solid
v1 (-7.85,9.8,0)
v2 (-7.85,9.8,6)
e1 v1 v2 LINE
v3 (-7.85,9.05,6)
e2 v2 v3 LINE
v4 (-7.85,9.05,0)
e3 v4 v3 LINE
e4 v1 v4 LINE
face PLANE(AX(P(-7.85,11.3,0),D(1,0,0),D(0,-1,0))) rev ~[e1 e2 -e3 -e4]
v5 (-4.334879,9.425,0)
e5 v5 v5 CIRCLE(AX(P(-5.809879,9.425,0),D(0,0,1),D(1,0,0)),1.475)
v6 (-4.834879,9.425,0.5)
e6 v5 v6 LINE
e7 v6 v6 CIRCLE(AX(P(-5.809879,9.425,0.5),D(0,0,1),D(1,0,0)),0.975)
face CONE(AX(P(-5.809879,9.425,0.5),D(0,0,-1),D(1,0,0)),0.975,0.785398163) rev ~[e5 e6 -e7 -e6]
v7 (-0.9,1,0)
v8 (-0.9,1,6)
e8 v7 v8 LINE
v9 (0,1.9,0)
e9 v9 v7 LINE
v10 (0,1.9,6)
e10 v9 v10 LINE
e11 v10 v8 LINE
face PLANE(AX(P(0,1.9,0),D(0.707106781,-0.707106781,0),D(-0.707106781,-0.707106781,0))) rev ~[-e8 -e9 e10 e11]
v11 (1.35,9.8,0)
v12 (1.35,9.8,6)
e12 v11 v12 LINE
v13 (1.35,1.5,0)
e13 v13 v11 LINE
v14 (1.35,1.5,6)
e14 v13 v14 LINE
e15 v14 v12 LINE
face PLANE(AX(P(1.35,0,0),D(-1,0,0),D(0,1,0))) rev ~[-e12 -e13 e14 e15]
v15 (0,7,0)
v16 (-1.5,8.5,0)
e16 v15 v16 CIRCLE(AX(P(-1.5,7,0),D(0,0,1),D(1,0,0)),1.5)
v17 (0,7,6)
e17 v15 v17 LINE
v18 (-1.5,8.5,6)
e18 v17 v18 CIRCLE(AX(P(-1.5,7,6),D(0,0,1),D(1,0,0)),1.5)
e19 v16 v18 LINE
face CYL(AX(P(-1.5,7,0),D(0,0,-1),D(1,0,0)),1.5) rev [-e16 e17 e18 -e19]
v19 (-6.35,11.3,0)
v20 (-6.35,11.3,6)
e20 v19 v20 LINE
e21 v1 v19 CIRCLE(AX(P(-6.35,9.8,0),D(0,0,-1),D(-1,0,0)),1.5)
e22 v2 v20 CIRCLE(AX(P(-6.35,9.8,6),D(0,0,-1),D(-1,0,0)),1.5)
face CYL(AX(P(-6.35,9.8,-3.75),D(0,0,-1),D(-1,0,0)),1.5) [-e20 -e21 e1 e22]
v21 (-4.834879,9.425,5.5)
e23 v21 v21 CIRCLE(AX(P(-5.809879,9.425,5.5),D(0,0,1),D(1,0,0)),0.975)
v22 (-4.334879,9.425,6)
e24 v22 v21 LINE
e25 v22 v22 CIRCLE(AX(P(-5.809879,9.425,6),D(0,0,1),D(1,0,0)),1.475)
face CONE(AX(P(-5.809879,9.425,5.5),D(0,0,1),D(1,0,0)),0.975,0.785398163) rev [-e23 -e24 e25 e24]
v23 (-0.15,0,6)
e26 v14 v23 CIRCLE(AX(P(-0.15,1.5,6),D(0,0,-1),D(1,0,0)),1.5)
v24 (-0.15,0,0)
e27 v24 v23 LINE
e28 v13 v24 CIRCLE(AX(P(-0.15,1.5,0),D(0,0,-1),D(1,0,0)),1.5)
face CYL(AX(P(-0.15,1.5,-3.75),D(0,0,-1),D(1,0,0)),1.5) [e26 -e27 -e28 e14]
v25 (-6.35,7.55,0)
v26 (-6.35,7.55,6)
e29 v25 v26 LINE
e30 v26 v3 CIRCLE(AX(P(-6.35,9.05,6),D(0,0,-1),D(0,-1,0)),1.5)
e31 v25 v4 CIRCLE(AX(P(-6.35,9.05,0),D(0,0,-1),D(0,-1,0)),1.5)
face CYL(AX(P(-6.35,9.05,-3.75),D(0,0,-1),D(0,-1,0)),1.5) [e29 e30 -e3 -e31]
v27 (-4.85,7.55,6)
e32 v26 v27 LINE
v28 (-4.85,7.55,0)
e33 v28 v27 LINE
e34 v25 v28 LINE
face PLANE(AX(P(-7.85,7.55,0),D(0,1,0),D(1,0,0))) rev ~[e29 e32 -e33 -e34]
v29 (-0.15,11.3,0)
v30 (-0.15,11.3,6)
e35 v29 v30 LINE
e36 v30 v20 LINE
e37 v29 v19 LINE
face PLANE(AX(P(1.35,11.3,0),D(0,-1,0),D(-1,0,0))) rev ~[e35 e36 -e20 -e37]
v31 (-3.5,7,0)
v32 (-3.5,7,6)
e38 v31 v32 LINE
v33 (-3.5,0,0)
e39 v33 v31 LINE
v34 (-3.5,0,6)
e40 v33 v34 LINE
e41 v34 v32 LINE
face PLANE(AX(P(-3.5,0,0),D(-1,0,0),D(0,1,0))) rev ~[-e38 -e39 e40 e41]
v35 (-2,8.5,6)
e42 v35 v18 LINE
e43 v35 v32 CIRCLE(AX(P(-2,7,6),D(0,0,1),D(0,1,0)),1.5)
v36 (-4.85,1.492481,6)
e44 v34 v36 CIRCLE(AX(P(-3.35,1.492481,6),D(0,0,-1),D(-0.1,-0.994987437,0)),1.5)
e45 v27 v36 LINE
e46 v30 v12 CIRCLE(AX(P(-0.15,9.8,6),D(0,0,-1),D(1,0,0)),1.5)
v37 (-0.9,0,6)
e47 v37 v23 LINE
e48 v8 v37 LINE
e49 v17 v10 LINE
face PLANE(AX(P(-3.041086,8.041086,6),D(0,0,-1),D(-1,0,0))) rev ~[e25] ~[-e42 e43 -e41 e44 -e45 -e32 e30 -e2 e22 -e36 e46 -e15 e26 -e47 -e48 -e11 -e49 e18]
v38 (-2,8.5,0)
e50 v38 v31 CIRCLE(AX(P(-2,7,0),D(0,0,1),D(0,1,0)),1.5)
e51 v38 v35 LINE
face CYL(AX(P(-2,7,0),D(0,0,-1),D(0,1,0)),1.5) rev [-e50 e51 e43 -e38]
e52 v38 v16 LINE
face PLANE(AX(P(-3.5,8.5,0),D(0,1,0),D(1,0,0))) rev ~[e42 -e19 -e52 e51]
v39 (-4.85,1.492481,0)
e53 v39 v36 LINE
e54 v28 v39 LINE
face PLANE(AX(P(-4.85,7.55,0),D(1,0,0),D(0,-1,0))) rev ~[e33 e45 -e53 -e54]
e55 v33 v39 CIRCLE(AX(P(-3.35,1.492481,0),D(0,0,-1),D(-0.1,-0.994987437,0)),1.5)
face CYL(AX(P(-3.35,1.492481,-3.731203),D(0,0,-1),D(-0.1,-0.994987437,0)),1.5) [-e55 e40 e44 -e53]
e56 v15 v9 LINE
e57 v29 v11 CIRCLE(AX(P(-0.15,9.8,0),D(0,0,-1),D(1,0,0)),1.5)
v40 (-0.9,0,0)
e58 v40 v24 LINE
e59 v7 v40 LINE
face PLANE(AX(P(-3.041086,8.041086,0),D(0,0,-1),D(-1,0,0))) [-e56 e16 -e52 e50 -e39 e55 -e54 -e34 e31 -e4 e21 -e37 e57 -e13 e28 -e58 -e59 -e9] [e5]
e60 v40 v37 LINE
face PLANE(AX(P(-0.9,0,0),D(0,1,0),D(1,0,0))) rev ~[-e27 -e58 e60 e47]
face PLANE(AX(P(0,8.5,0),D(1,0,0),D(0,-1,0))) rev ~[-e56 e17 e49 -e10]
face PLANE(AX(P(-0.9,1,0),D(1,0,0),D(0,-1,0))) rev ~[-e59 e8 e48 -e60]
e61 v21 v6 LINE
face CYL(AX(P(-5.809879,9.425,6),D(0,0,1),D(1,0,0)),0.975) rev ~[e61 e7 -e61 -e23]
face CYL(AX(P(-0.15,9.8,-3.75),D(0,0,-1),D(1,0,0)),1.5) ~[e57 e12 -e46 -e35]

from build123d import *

# Parameters (mm, degrees)
F1_DEPTH     = 6
F2_R         = 0.975
F3_DEPTH     = 6.001
F4_T1_DEPTH  = 6
F4_T3_DEPTH  = 6
F4_T5_DEPTH  = 13.5
F4_T7_DEPTH  = 13.5
F4_T9_DEPTH  = 13.5
F4_T11_DEPTH = 13.5
F4_T13_DEPTH = 13.4624057783
F5_SIZE      = 0.5


# Not quite as in the source:
# - a fillet or chamfer that OpenCascade refuses, or shapes differently, is made with other operations: its cross-section is extruded or revolved along the edge and cut away or added


with BuildPart() as f1:
    # F0 (on Top) → F1 (new body)
    with BuildSketch(Plane.XY):
        Polygon((0, 1.9), (0, 0), (1.35, 0), (1.35, 11.3), (-7.85, 11.3), (-7.85, 7.55), (-4.85, 7.55), (-4.85, 0), (-3.5, 0), (-3.5, 8.5), (0, 8.5), align=None)
        Polygon((-0.9, 0), (0, 0), (0, 1.9), (-0.9, 1), align=None)
    extrude(amount=F1_DEPTH)

    # F2 (on face) → F3 (cut, through all)
    with BuildSketch(Plane.XY.offset(6)):
        with Locations((-5.8098790534, 9.425)):
            Circle(F2_R)
    extrude(amount=-F3_DEPTH, mode=Mode.SUBTRACT)

    # F4: fillet of radius 1.5 on 7 edges, made by hand

    # F4_s2 → F4_t1 (join)
    with BuildSketch(Plane.XY):
        with BuildLine():
            ThreePointArc((0, 7), (-0.4393398282, 8.0606601718), (-1.5, 8.5))
            Line((-1.5, 8.5), (0, 8.5))
            Line((0, 8.5), (0, 7))
        make_face()
    extrude(amount=F4_T1_DEPTH)

    # F4_s4 → F4_t3 (join)
    with BuildSketch(Plane.XY):
        with BuildLine():
            ThreePointArc((-2, 8.5), (-3.0606601718, 8.0606601718), (-3.5, 7))
            Line((-3.5, 7), (-3.5, 8.5))
            Line((-3.5, 8.5), (-2, 8.5))
        make_face()
    extrude(amount=F4_T3_DEPTH)

    # F4_s6 → F4_t5 (cut)
    with BuildSketch(Plane.XY.offset(-3.75)):
        with BuildLine():
            ThreePointArc((1.35, 1.5), (0.9106601718, 0.4393398282), (-0.15, 0))
            Line((-0.15, 0), (1.35, 0))
            Line((1.35, 0), (1.35, 1.5))
        make_face()
    extrude(amount=F4_T5_DEPTH, mode=Mode.SUBTRACT)

    # F4_s8 → F4_t7 (cut)
    with BuildSketch(Plane.XY.offset(-3.75)):
        with BuildLine():
            ThreePointArc((1.35, 9.8), (0.9106601718, 10.8606601718), (-0.15, 11.3))
            Line((-0.15, 11.3), (1.35, 11.3))
            Line((1.35, 11.3), (1.35, 9.8))
        make_face()
    extrude(amount=F4_T7_DEPTH, mode=Mode.SUBTRACT)

    # F4_s10 → F4_t9 (cut)
    with BuildSketch(Plane.XY.offset(-3.75)):
        with BuildLine():
            ThreePointArc((-7.85, 9.8), (-7.4106601718, 10.8606601718), (-6.35, 11.3))
            Line((-6.35, 11.3), (-7.85, 11.3))
            Line((-7.85, 11.3), (-7.85, 9.8))
        make_face()
    extrude(amount=F4_T9_DEPTH, mode=Mode.SUBTRACT)

    # F4_s12 → F4_t11 (cut)
    with BuildSketch(Plane.XY.offset(-3.75)):
        with BuildLine():
            ThreePointArc((-6.35, 7.55), (-7.4106601718, 7.9893398282), (-7.85, 9.05))
            Line((-7.85, 9.05), (-7.85, 7.55))
            Line((-7.85, 7.55), (-6.35, 7.55))
        make_face()
    extrude(amount=F4_T11_DEPTH, mode=Mode.SUBTRACT)

    # F4_s14 → F4_t13 (cut)
    with BuildSketch(Plane.XY.offset(-3.7312028891)):
        with BuildLine():
            ThreePointArc((-3.5, 0), (-4.4624297731, 0.4862505658), (-4.85, 1.4924811557))
            Line((-4.85, 1.4924811557), (-4.85, 0))
            Line((-4.85, 0), (-3.5, 0))
        make_face()
    extrude(amount=F4_T13_DEPTH, mode=Mode.SUBTRACT)

    # F5
    f5_edges = [f1.edges().sort_by_distance(p)[0] for p in [
        (-6.784879, 9.425, 6),
        (-6.784879, 9.425, 0),
    ]]
    chamfer(f5_edges, length=F5_SIZE)


solid = f1.part
